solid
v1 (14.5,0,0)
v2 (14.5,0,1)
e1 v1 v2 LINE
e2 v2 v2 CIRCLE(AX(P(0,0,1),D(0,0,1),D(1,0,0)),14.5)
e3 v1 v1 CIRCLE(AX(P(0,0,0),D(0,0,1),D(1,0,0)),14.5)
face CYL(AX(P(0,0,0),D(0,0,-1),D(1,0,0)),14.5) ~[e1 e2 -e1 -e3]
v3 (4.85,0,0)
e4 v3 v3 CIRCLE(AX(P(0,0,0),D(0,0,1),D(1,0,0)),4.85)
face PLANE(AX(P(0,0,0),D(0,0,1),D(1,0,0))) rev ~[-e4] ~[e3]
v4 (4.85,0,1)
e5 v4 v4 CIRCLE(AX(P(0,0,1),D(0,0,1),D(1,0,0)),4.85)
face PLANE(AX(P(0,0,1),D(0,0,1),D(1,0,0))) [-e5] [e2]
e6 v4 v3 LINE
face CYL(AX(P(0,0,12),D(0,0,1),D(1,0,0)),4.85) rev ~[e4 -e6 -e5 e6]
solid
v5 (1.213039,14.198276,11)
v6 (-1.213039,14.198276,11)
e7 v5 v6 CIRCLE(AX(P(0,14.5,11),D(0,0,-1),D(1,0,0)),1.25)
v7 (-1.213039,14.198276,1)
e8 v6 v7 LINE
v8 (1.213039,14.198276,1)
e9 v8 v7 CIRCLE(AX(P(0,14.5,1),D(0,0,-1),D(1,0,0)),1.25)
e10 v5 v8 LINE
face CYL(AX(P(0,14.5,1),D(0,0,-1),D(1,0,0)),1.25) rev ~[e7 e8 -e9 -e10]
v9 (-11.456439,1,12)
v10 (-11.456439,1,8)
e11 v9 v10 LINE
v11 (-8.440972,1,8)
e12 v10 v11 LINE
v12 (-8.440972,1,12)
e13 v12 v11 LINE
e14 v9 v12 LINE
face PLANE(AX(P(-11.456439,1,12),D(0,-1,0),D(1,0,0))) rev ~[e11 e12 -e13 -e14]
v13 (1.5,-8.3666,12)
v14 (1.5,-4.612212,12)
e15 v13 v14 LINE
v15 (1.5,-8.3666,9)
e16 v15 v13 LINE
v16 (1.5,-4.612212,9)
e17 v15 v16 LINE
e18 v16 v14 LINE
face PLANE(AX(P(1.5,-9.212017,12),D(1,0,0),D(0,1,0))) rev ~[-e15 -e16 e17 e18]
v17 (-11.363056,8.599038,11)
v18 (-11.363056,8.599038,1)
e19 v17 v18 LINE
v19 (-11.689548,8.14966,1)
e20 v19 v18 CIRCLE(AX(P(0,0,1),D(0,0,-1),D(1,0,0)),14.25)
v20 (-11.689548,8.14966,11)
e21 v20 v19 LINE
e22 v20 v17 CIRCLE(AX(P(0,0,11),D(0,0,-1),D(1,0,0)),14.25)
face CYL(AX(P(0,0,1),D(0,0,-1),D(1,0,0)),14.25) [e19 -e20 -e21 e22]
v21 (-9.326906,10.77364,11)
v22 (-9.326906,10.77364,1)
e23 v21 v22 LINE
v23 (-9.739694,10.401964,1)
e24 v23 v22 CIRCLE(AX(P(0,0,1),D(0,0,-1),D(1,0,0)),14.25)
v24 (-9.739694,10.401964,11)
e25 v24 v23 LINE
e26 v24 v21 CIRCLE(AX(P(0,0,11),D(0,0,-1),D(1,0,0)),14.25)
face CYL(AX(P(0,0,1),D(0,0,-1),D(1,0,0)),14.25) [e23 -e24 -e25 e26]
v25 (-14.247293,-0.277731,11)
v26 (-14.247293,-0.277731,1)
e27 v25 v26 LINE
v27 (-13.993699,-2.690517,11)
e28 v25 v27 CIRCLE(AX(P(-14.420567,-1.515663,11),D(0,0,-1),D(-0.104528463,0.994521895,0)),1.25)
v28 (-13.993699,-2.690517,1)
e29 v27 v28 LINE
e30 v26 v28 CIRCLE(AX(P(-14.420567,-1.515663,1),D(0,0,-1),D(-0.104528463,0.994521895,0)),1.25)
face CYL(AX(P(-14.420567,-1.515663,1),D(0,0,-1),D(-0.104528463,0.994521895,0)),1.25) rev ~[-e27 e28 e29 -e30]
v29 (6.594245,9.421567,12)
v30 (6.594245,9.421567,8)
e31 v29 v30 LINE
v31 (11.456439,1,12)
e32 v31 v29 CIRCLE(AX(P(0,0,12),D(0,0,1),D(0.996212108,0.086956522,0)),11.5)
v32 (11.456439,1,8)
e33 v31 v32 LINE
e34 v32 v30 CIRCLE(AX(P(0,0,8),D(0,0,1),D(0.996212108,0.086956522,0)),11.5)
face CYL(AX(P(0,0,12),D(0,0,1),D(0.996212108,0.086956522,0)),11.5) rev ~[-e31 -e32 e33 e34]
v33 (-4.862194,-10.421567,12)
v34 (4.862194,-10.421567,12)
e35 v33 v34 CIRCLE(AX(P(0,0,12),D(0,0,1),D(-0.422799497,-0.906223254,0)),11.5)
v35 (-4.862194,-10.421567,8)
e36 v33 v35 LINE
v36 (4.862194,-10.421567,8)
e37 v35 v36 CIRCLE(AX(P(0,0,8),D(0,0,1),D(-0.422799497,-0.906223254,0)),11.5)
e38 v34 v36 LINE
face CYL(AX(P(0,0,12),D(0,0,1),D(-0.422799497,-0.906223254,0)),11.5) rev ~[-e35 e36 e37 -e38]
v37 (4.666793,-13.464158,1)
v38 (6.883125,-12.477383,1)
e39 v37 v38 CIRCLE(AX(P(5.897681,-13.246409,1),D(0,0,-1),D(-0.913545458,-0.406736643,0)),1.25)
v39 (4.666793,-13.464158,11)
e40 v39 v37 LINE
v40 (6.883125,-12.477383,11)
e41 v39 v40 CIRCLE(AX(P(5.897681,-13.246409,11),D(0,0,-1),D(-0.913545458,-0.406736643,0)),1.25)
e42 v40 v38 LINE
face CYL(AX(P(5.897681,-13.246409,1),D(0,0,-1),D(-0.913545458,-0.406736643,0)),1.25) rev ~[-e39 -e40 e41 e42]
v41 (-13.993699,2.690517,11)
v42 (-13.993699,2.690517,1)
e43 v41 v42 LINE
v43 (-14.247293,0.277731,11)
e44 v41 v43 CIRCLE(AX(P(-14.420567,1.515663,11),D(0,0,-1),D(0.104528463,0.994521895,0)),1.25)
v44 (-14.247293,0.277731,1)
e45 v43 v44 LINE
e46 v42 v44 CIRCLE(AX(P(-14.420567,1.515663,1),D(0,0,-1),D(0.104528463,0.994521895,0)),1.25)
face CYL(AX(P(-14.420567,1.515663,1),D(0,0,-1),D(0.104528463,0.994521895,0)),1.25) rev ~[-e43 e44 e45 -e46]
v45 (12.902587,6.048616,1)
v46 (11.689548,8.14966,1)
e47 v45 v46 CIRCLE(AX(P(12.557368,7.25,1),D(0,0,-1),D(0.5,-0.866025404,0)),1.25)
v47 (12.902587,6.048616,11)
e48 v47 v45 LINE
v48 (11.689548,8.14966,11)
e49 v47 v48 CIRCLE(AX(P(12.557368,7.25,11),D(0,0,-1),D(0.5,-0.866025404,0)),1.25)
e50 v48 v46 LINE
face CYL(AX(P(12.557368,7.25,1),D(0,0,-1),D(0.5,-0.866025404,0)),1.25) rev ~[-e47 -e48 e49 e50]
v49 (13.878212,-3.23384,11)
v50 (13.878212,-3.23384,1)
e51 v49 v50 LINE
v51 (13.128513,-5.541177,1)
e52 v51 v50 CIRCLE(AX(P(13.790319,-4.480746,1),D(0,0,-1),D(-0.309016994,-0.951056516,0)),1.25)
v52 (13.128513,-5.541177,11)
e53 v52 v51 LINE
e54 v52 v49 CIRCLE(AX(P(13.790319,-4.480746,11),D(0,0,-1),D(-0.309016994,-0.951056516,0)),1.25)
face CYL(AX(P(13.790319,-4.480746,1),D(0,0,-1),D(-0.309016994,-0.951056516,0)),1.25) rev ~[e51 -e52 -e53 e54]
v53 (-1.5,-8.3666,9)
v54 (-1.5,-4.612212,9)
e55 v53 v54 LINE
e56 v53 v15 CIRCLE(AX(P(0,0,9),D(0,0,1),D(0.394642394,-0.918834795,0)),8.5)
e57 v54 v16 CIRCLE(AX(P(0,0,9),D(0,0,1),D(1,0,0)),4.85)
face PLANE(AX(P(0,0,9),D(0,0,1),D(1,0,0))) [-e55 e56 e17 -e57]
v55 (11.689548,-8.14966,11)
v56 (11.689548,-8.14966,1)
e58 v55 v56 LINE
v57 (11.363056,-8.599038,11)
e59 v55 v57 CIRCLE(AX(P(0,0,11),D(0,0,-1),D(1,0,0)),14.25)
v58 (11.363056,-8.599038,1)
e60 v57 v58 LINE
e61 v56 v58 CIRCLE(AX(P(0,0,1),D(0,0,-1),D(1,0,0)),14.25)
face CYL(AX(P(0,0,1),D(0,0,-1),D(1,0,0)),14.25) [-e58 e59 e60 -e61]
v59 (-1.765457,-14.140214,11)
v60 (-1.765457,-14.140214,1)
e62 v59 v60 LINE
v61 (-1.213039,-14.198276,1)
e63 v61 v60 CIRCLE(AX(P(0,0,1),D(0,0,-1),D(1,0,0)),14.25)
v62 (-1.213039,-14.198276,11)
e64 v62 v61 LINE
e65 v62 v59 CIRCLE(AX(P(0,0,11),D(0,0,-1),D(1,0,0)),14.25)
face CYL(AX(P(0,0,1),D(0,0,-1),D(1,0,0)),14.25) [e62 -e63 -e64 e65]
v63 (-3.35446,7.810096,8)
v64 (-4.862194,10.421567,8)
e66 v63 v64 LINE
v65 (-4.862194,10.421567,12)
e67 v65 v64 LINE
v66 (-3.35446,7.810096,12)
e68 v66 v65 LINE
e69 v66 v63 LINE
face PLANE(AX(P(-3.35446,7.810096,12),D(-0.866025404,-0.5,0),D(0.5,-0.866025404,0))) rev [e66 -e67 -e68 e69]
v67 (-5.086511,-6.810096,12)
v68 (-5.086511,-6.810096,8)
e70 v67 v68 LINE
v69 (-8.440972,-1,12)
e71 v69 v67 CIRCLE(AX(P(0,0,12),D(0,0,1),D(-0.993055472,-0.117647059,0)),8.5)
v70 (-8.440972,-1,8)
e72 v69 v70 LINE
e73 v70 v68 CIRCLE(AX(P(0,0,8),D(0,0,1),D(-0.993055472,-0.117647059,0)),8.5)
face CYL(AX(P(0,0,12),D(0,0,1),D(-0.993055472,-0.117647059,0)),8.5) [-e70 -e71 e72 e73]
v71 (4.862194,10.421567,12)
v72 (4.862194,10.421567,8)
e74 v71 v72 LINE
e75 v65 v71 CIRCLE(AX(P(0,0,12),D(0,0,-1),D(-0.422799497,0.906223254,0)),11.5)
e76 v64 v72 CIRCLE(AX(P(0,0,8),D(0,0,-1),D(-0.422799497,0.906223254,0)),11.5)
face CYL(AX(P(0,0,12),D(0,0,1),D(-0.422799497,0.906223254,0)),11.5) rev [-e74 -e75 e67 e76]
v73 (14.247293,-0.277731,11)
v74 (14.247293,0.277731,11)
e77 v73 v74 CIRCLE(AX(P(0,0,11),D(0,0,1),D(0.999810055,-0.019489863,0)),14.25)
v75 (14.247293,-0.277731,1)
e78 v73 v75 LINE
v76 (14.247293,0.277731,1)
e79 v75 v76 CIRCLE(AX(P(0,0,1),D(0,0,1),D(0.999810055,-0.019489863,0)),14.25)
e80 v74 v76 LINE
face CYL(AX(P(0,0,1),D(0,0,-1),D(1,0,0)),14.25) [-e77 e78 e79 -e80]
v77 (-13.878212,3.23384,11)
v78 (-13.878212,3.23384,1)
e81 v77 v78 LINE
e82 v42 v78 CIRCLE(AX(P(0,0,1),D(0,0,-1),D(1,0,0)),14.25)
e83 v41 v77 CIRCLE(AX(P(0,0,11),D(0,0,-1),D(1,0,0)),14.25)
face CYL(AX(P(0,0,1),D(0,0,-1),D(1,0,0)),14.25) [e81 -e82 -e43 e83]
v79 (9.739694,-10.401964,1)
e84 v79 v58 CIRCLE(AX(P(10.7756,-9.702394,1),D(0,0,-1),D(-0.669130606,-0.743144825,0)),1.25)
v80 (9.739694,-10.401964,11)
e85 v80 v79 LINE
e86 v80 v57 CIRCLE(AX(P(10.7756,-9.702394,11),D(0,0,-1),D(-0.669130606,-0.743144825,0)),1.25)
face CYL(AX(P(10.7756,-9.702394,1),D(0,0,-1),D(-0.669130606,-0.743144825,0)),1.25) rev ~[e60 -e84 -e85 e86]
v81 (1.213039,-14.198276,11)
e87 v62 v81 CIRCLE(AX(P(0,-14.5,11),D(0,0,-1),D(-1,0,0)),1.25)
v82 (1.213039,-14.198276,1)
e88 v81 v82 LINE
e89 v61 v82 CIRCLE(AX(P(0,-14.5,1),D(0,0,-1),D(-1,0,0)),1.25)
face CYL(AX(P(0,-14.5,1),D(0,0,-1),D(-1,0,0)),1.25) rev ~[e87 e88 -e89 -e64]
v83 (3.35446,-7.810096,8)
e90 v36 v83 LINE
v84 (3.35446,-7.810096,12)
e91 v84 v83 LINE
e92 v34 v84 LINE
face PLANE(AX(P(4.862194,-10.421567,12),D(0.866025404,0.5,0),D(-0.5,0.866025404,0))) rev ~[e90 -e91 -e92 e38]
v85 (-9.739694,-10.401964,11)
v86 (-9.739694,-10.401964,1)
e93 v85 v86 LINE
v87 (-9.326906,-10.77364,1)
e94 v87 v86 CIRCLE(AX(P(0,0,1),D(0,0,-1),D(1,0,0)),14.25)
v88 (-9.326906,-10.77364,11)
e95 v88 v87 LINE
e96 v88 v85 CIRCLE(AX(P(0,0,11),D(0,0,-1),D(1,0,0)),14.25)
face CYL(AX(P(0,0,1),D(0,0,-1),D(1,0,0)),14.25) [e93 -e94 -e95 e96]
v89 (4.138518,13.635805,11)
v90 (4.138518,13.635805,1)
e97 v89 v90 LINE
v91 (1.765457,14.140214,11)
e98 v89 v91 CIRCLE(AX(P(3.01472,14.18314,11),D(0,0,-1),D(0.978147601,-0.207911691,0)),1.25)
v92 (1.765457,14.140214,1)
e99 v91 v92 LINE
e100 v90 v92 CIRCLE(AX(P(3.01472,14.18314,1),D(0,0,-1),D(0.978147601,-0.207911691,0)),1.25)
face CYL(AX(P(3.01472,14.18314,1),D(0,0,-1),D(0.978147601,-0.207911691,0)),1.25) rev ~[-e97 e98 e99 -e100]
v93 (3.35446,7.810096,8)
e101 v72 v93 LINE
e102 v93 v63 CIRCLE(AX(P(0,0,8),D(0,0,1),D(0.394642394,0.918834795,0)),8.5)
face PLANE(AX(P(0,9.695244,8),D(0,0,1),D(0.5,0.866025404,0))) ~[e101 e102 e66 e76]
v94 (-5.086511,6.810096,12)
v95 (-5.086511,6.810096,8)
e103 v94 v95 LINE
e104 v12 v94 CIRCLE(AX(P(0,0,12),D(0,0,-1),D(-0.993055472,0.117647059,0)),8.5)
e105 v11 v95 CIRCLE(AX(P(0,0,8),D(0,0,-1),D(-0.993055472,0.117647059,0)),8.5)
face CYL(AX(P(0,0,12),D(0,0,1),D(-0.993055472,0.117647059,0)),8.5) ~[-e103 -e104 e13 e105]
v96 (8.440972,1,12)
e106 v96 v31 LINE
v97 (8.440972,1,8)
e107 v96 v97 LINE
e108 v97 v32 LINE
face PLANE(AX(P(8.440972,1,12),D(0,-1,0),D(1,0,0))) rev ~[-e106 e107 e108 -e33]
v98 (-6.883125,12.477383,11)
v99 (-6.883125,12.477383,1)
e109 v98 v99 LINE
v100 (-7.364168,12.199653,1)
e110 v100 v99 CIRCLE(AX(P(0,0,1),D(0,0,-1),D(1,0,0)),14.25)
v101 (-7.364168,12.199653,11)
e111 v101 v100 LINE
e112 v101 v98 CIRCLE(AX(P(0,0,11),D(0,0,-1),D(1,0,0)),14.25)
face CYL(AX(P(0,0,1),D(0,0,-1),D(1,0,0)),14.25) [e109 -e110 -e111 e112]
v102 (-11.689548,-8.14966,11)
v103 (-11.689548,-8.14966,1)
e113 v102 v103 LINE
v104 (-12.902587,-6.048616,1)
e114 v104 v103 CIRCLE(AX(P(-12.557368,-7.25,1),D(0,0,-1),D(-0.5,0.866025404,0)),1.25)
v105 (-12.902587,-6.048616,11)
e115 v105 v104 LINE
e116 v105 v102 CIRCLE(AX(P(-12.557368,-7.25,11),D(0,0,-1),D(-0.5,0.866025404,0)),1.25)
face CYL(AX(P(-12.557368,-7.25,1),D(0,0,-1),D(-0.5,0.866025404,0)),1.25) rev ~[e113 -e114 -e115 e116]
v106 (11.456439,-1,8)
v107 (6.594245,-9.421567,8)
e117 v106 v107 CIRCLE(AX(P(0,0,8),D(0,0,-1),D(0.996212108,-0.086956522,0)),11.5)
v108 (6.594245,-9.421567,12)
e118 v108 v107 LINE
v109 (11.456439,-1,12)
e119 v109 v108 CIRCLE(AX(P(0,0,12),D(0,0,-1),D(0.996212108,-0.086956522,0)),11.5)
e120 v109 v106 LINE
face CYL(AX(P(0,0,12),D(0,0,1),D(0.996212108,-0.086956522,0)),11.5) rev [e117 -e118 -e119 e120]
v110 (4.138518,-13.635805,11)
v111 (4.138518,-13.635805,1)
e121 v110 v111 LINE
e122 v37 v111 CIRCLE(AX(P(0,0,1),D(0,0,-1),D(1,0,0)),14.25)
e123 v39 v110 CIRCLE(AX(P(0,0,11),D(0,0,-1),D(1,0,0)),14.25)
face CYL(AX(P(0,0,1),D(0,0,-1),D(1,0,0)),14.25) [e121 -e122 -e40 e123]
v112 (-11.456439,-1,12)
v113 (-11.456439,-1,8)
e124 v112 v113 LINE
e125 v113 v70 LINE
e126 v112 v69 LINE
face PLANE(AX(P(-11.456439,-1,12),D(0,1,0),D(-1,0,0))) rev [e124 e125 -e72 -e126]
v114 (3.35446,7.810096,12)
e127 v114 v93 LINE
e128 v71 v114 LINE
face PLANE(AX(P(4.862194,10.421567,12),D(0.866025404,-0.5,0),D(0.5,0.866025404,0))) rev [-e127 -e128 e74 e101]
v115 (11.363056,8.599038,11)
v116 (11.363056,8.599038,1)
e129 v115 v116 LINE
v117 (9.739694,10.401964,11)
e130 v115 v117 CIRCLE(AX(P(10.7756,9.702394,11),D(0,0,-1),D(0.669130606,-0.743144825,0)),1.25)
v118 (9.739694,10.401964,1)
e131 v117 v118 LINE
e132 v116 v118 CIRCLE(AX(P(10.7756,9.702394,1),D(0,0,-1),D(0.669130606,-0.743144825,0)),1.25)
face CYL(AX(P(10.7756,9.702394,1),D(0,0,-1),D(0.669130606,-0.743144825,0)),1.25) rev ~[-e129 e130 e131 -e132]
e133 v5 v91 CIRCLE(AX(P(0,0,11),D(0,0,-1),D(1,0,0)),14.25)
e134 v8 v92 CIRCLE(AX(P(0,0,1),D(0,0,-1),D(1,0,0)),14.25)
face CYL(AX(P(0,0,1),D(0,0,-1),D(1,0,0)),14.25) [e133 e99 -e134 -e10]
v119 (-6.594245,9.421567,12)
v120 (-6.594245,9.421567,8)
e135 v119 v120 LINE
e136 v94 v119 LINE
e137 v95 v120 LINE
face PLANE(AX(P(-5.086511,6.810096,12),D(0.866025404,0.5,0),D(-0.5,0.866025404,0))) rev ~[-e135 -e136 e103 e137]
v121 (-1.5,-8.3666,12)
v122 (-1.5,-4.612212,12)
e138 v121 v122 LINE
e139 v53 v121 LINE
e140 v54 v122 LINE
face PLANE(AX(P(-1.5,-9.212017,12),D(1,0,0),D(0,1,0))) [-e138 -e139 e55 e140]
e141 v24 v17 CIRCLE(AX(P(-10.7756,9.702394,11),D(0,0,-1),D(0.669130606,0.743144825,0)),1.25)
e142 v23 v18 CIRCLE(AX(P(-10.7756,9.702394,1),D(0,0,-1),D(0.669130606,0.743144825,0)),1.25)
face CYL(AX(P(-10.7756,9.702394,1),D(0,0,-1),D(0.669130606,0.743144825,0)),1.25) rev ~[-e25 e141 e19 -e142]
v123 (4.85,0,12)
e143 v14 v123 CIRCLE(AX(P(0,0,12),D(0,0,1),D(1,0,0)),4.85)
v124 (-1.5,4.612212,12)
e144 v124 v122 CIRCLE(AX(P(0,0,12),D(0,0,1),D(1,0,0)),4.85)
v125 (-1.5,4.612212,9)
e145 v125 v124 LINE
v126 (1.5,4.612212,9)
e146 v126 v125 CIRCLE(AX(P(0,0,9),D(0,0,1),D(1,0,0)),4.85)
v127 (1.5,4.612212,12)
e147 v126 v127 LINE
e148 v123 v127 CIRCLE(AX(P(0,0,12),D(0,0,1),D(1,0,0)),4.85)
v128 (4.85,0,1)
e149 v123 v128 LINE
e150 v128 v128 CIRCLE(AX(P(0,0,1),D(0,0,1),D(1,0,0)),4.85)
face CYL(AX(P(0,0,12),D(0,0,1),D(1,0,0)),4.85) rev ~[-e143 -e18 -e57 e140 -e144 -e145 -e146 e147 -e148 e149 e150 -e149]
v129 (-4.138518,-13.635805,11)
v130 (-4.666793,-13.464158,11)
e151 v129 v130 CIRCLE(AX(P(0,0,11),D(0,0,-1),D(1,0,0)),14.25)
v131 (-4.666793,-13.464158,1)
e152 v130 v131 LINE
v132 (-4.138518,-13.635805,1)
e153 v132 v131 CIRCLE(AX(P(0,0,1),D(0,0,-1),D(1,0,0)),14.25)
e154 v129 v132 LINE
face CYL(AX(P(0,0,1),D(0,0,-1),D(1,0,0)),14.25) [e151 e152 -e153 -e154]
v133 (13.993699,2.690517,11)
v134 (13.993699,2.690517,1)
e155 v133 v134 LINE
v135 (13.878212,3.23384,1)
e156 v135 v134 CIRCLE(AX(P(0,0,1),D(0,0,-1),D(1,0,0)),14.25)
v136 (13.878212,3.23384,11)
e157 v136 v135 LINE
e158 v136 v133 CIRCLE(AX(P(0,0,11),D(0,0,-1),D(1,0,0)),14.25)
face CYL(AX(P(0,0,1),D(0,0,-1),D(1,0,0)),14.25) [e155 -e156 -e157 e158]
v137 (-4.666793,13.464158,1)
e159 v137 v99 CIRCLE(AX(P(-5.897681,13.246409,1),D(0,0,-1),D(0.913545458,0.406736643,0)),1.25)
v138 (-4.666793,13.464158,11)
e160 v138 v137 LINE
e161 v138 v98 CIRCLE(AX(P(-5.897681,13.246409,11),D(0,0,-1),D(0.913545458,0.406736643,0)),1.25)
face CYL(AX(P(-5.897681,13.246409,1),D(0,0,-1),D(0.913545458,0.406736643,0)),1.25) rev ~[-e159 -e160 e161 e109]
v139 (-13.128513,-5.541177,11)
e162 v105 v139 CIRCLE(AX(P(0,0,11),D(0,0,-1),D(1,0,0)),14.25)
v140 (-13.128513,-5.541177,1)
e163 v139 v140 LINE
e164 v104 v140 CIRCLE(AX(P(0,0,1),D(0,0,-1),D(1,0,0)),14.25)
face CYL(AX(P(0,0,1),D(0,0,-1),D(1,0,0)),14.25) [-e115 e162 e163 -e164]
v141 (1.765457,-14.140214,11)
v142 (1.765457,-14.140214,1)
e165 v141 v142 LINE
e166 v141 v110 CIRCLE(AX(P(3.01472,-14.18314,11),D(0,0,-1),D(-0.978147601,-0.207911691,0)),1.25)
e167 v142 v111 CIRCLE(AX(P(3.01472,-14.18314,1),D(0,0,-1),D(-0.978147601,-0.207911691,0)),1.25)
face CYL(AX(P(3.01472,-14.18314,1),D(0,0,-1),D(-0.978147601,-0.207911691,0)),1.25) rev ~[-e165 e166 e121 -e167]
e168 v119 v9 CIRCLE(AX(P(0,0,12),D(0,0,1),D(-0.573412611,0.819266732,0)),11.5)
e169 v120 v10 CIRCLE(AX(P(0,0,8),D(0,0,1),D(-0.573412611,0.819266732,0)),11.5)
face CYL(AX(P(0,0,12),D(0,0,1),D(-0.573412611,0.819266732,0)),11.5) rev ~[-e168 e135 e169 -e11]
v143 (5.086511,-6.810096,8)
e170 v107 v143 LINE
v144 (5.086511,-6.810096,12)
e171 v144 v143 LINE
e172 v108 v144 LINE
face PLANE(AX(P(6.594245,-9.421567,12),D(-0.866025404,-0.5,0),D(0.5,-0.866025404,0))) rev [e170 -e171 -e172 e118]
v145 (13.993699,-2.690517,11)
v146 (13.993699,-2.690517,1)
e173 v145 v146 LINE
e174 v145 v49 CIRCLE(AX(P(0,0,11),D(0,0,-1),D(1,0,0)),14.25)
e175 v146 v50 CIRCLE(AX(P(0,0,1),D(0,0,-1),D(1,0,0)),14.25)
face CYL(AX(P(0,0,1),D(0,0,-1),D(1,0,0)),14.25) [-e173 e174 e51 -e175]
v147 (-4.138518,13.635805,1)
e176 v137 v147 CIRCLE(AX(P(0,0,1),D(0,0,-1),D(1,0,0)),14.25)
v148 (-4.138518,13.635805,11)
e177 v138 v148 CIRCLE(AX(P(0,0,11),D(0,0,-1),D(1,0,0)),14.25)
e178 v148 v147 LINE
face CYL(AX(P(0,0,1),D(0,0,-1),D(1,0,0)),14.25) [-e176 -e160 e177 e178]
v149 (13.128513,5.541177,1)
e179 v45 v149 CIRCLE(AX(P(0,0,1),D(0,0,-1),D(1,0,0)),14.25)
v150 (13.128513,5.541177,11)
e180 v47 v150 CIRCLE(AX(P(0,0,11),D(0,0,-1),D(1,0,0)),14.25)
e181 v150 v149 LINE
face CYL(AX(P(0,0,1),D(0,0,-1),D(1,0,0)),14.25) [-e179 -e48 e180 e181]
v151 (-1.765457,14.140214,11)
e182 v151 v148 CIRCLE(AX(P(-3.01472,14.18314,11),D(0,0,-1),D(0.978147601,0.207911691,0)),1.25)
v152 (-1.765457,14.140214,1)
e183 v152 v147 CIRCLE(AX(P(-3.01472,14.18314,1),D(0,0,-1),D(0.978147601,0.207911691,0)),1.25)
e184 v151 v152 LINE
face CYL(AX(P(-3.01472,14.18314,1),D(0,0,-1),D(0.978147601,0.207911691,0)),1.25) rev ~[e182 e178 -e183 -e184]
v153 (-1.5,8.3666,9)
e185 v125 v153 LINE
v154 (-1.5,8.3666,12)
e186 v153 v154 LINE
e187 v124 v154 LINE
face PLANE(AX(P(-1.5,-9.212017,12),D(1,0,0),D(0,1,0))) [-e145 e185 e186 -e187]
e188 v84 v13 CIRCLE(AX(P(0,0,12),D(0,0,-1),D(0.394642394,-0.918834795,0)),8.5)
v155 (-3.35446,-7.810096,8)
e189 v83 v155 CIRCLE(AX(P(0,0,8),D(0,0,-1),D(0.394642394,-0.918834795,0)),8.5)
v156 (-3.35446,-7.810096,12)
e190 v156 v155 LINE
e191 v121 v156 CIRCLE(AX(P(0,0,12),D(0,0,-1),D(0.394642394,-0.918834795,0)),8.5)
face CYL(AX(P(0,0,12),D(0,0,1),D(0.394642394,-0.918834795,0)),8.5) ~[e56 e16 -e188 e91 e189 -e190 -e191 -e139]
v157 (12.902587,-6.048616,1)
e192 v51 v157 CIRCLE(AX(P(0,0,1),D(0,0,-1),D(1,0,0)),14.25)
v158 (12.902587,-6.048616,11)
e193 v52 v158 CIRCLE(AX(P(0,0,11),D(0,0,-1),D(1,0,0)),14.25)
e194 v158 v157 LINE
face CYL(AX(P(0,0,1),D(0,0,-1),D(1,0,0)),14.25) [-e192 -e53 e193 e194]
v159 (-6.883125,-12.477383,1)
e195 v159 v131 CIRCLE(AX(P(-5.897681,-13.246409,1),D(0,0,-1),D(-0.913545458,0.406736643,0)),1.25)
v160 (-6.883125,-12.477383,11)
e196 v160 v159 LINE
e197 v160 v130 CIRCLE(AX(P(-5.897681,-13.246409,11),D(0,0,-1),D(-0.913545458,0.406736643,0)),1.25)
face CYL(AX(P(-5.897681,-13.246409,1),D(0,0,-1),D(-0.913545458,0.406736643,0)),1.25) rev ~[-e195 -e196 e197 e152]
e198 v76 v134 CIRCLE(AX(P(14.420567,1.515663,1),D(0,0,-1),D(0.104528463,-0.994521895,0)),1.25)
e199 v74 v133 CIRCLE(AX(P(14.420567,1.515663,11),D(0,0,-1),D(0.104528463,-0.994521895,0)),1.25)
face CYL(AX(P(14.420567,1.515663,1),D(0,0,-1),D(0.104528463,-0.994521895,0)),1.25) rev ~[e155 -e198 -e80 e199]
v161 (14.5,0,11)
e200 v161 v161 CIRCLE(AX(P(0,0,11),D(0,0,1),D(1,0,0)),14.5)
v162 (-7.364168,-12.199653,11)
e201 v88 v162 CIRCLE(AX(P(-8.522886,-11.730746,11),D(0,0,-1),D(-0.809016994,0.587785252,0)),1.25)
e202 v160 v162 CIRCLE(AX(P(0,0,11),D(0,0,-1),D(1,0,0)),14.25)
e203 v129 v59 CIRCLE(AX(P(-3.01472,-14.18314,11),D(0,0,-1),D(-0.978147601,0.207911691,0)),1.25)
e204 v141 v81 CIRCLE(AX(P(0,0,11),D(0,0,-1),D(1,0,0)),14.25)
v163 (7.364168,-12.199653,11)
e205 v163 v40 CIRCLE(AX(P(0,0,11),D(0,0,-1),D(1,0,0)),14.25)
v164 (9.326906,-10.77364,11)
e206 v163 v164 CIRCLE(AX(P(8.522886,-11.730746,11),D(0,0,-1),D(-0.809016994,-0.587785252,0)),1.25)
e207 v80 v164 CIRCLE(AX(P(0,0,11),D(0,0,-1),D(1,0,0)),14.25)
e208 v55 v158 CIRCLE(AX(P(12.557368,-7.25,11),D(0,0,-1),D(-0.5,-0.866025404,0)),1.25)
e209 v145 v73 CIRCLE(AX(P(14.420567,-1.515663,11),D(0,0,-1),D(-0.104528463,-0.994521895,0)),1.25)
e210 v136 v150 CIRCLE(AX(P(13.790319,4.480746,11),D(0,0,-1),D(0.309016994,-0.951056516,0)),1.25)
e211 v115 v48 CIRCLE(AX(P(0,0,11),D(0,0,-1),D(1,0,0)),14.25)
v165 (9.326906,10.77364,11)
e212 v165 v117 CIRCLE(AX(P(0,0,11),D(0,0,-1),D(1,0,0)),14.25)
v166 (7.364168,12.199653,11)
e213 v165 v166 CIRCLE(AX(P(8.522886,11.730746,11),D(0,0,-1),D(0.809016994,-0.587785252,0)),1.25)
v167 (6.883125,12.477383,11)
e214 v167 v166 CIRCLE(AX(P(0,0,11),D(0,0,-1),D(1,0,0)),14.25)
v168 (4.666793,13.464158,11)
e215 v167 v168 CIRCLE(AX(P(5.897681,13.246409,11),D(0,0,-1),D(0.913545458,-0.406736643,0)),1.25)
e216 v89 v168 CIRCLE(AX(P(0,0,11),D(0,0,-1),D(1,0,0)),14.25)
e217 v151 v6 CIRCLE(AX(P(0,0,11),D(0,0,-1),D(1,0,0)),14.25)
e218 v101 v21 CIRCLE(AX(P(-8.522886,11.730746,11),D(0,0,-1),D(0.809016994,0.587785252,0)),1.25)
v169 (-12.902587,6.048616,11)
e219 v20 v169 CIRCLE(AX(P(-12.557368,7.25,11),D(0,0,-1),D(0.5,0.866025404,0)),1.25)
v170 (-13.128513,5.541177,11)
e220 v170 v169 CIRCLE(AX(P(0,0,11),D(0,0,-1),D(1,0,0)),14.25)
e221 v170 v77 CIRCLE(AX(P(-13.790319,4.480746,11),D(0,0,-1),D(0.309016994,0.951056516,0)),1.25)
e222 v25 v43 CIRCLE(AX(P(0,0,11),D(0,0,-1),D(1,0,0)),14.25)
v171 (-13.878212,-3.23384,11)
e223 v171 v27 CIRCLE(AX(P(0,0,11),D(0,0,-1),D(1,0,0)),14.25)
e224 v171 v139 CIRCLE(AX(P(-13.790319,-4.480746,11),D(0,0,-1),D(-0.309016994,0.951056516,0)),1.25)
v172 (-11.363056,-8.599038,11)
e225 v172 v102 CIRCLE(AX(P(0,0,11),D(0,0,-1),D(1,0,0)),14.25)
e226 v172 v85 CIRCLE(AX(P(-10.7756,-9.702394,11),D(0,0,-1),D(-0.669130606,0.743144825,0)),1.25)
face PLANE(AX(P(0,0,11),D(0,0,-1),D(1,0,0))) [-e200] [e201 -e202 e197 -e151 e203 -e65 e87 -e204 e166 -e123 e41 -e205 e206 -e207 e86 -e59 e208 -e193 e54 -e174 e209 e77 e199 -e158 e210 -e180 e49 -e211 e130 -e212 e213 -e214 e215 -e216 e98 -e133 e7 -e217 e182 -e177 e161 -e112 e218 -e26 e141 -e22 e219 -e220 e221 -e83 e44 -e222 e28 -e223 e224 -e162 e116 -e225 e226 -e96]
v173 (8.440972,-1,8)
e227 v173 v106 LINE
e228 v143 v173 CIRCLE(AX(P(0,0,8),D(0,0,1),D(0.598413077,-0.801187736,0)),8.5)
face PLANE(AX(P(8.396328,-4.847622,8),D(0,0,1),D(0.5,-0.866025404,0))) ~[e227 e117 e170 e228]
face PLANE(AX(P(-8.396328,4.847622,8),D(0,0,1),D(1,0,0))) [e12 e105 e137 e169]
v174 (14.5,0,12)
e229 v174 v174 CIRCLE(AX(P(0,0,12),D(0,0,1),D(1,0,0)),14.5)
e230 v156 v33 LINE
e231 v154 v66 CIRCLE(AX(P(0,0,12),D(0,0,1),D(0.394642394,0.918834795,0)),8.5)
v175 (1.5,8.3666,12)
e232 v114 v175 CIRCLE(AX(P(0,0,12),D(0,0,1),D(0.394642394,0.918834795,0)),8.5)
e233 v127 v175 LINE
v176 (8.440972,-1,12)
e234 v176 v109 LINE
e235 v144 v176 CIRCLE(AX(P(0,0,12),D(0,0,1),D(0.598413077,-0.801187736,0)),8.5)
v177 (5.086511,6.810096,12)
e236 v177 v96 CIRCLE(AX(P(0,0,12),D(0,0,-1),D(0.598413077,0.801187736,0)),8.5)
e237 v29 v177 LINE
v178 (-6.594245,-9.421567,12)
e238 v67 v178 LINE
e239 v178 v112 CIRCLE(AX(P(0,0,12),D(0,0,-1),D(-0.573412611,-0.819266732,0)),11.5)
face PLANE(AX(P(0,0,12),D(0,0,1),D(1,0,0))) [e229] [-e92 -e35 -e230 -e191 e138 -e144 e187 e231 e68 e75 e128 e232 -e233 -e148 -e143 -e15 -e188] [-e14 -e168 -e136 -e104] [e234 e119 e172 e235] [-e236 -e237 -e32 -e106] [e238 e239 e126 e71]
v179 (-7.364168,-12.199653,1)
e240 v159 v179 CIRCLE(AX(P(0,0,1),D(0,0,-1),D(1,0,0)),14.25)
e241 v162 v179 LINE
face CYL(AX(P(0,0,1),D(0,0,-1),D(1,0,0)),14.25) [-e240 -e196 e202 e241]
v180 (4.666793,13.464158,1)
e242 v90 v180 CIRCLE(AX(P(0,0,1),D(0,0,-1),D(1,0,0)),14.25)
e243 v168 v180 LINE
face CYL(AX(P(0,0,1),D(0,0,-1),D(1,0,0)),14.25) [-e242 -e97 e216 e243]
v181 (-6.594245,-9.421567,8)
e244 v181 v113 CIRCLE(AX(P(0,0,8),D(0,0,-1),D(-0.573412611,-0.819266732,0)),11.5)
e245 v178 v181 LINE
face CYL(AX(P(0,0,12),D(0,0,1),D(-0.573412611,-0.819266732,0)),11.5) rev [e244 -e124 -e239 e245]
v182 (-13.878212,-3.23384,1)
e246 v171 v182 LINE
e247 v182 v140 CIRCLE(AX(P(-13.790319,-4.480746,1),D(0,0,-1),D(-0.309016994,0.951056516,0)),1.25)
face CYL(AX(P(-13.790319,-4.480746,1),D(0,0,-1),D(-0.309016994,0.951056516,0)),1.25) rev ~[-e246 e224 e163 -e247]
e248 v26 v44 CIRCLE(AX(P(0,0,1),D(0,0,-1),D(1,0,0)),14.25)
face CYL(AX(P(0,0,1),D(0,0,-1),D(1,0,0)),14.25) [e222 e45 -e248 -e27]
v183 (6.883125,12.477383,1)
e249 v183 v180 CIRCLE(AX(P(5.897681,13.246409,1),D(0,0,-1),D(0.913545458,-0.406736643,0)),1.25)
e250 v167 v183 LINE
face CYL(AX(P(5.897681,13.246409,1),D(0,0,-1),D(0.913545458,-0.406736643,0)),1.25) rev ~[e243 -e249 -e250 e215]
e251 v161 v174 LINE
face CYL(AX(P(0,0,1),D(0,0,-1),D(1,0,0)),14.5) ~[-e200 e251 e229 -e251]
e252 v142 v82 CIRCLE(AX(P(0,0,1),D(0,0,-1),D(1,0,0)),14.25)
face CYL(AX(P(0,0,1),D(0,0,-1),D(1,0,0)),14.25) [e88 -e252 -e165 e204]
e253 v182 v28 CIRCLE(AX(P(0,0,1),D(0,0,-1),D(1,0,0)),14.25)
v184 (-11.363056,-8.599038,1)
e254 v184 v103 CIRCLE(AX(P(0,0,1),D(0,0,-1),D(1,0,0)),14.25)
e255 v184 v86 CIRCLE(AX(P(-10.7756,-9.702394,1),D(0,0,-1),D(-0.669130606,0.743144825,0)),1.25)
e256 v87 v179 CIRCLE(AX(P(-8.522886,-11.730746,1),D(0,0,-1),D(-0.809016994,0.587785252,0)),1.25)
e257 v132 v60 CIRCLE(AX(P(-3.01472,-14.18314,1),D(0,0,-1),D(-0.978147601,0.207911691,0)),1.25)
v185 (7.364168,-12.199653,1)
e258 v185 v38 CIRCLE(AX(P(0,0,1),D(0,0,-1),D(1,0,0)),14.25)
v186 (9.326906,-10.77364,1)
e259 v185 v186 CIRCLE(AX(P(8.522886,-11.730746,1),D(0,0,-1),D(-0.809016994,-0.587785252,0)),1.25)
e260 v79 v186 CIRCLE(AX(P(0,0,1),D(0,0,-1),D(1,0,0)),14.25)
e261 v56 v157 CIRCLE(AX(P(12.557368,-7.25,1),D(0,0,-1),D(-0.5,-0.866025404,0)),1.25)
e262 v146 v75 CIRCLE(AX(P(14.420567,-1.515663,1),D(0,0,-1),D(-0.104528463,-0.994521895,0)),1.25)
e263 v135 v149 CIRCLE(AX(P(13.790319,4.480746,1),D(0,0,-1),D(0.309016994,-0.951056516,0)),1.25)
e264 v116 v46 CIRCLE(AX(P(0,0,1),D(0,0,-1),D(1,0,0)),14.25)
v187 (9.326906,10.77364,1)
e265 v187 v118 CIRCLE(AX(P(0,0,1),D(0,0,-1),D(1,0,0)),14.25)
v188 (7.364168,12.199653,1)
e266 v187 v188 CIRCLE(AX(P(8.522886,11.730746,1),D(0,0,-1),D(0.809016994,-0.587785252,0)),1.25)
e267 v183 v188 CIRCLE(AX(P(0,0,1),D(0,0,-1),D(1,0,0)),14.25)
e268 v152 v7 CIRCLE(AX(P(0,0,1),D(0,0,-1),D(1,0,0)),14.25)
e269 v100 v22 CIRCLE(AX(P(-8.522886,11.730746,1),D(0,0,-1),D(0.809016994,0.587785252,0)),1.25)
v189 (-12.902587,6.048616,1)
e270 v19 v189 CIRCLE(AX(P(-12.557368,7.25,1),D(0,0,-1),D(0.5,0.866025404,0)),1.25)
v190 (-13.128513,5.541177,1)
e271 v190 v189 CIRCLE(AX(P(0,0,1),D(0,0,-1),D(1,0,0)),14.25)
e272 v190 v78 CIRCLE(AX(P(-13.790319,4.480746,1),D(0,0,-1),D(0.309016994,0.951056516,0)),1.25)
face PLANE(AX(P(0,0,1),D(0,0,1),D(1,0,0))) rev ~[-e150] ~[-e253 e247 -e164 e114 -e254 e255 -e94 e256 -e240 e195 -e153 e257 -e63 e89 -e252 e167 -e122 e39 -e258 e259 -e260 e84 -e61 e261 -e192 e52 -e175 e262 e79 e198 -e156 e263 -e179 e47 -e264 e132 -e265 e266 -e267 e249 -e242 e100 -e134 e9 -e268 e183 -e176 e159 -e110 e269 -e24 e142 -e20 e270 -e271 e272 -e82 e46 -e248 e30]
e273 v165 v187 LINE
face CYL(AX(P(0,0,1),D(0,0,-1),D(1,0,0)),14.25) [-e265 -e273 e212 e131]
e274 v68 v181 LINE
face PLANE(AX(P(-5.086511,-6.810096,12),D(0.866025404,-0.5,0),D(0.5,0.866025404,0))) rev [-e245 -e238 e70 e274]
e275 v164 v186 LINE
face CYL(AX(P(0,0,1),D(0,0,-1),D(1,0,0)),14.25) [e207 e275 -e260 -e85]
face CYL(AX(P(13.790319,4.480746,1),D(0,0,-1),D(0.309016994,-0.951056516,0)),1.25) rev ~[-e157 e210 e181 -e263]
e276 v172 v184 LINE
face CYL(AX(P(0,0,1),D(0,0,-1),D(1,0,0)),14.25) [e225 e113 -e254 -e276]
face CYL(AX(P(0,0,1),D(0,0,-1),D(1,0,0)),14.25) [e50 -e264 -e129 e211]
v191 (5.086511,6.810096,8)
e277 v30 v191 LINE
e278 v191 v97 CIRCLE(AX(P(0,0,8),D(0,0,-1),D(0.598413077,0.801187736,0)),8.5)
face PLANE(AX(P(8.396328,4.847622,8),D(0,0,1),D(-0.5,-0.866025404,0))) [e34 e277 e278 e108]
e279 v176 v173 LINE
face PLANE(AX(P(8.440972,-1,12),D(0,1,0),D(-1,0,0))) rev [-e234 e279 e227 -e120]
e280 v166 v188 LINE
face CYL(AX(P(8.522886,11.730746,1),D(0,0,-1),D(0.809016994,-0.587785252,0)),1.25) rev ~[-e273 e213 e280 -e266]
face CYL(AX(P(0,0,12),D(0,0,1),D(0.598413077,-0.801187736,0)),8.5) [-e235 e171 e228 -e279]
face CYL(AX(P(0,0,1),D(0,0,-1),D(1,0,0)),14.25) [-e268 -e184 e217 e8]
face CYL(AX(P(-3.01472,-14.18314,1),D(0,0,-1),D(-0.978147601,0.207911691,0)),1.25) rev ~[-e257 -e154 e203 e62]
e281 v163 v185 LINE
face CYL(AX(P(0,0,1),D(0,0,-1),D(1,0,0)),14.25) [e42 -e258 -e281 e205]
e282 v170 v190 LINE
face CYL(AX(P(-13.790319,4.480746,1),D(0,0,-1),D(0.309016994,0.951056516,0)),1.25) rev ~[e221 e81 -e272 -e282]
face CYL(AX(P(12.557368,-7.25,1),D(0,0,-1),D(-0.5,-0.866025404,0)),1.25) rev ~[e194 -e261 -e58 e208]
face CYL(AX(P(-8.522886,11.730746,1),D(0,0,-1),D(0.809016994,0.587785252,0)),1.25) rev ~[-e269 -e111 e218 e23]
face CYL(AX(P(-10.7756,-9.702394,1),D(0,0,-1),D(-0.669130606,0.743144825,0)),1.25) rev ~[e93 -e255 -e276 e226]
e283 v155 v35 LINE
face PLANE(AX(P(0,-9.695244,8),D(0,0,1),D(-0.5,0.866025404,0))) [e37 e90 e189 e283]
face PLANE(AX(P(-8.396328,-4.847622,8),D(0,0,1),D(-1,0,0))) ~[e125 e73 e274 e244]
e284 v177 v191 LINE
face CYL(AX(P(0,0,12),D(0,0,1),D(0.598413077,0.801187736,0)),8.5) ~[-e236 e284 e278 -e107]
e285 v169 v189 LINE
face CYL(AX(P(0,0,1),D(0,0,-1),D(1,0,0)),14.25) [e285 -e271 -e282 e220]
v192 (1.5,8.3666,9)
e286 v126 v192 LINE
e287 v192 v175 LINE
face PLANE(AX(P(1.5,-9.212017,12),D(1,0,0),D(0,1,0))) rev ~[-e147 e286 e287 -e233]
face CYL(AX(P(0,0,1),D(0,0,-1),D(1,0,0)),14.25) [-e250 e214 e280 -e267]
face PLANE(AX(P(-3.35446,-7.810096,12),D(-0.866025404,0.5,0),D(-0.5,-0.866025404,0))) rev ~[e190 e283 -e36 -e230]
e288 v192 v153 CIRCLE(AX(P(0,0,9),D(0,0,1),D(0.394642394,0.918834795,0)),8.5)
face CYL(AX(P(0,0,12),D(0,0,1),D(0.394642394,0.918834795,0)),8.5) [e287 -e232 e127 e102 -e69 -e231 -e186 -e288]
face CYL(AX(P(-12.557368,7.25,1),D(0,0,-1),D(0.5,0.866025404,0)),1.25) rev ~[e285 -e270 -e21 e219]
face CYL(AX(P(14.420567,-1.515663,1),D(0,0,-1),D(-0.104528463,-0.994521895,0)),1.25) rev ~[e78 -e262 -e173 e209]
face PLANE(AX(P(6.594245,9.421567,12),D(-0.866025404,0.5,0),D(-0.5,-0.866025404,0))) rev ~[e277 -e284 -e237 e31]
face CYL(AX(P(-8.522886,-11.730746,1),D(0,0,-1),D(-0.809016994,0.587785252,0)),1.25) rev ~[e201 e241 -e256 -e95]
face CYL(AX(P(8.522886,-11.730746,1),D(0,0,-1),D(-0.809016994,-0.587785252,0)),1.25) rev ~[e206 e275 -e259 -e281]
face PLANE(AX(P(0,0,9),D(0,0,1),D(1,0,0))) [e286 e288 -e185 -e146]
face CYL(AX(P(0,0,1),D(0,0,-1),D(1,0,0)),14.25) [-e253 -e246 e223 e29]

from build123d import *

# Parameters (mm, degrees)
F0_R            = 14.5
F1_DEPTH        = 1
F2_R            = 14.5
F3_DEPTH        = 11
F4_R            = 1.25
F5_DEPTH        = 10
F5_COPIES_COUNT = 30
F6_R            = 14.5
F6_R_2          = 14.25
F7_DEPTH        = 10
F9_DEPTH        = 4
F9_COPIES_COUNT = 3
F10_R           = 4.85
F11_DEPTH       = 12.001
F12_W           = 3
F12_H           = 18.4240331947
F13_DEPTH       = 3


# Not quite as in the source:
# - a pattern or mirror of a feature is missing from the dataset's text; its kind, count and spacing are read off the source's solid


with BuildPart() as f1:
    # F0 (on Top) → F1 (new body)
    with BuildSketch(Plane.XY):
        Circle(F0_R)
    extrude(amount=F1_DEPTH)


with BuildPart() as f3:
    # F2 (on face) → F3 (new body)
    with BuildSketch(Plane.XY.offset(1)):
        Circle(F2_R)
    extrude(amount=F3_DEPTH)

    # F4 (on face) → F5 (cut)
    with BuildSketch(Plane(origin=(0, 0, 1), x_dir=(1, 0, 0), z_dir=(0, 0, -1))):
        with Locations((0, -14.5)):
            Circle(F4_R)
    f5 = extrude(amount=-F5_DEPTH, mode=Mode.SUBTRACT)

    # F5_copies: F5 ×30 about axis
    f5_copies_axis = Axis((0, 0, 0), (0, 0, 1))
    for i in range(1, F5_COPIES_COUNT):
        add(f5.rotate(f5_copies_axis, i * 360 / F5_COPIES_COUNT), mode=Mode.SUBTRACT)

    # F6 (on face) → F7 (cut)
    with BuildSketch(Plane(origin=(0, 0, 1), x_dir=(1, 0, 0), z_dir=(0, 0, -1))):
        Circle(F6_R)
        Circle(F6_R_2, mode=Mode.SUBTRACT)
    extrude(amount=-F7_DEPTH, mode=Mode.SUBTRACT)

    # F8 (on face) → F9 (cut)
    with BuildSketch(Plane.XY.offset(12)):
        with BuildLine():
            Line((-5.0865111578, 6.8100957586), (-6.5942450225, 9.4215674165))
            ThreePointArc((-6.5942450225, 9.4215674165), (-9.9592921435, 5.75), (-11.4564392374, 1))
            Line((-11.4564392374, 1), (-8.4409715081, 1))
            ThreePointArc((-8.4409715081, 1), (-7.3612159322, 4.25), (-5.0865111578, 6.8100957586))
        make_face()
    f9 = extrude(amount=-F9_DEPTH, mode=Mode.SUBTRACT)

    # F9_copies: F9 ×3 about axis
    f9_copies_axis = Axis((0, 0, 0), (0, 0, 1))
    for i in range(1, F9_COPIES_COUNT):
        add(f9.rotate(f9_copies_axis, i * 360 / F9_COPIES_COUNT), mode=Mode.SUBTRACT)

    # F9_copies1: F9 across plane
    add(f9.mirror(Plane(origin=(0, 0, 0), x_dir=(0.5, 0.8660254038, 0), z_dir=(0.8660254038, -0.5, 0))), mode=Mode.SUBTRACT)

    # F9_copies2: F9 across plane
    add(f9.mirror(Plane(origin=(0, 0, 0), x_dir=(0, 0, -1), z_dir=(0, -1, 0))), mode=Mode.SUBTRACT)

    # F9_copies3: F9 across plane
    add(f9.mirror(Plane(origin=(0, 0, 0), x_dir=(-0.5, 0.8660254038, 0), z_dir=(0.8660254038, 0.5, 0))), mode=Mode.SUBTRACT)


with BuildPart() as f11_tool:
    # F10 (on face) → F11 (new body, through all)
    with BuildSketch(Plane.XY.offset(12)):
        Circle(F10_R)
    extrude(amount=-F11_DEPTH)


with BuildPart() as f1_1:
    add(f1.part)

    # F11: cut by f11_tool
    add(f11_tool.part, mode=Mode.SUBTRACT)


with BuildPart() as f3_1:
    add(f3.part)

    # F11: cut by f11_tool
    add(f11_tool.part, mode=Mode.SUBTRACT)

    # F12 (on face) → F13 (cut)
    with BuildSketch(Plane.XY.offset(12)):
        Rectangle(F12_W, F12_H)
    extrude(amount=-F13_DEPTH, mode=Mode.SUBTRACT)


solid = Compound([f1_1.part, f3_1.part])
